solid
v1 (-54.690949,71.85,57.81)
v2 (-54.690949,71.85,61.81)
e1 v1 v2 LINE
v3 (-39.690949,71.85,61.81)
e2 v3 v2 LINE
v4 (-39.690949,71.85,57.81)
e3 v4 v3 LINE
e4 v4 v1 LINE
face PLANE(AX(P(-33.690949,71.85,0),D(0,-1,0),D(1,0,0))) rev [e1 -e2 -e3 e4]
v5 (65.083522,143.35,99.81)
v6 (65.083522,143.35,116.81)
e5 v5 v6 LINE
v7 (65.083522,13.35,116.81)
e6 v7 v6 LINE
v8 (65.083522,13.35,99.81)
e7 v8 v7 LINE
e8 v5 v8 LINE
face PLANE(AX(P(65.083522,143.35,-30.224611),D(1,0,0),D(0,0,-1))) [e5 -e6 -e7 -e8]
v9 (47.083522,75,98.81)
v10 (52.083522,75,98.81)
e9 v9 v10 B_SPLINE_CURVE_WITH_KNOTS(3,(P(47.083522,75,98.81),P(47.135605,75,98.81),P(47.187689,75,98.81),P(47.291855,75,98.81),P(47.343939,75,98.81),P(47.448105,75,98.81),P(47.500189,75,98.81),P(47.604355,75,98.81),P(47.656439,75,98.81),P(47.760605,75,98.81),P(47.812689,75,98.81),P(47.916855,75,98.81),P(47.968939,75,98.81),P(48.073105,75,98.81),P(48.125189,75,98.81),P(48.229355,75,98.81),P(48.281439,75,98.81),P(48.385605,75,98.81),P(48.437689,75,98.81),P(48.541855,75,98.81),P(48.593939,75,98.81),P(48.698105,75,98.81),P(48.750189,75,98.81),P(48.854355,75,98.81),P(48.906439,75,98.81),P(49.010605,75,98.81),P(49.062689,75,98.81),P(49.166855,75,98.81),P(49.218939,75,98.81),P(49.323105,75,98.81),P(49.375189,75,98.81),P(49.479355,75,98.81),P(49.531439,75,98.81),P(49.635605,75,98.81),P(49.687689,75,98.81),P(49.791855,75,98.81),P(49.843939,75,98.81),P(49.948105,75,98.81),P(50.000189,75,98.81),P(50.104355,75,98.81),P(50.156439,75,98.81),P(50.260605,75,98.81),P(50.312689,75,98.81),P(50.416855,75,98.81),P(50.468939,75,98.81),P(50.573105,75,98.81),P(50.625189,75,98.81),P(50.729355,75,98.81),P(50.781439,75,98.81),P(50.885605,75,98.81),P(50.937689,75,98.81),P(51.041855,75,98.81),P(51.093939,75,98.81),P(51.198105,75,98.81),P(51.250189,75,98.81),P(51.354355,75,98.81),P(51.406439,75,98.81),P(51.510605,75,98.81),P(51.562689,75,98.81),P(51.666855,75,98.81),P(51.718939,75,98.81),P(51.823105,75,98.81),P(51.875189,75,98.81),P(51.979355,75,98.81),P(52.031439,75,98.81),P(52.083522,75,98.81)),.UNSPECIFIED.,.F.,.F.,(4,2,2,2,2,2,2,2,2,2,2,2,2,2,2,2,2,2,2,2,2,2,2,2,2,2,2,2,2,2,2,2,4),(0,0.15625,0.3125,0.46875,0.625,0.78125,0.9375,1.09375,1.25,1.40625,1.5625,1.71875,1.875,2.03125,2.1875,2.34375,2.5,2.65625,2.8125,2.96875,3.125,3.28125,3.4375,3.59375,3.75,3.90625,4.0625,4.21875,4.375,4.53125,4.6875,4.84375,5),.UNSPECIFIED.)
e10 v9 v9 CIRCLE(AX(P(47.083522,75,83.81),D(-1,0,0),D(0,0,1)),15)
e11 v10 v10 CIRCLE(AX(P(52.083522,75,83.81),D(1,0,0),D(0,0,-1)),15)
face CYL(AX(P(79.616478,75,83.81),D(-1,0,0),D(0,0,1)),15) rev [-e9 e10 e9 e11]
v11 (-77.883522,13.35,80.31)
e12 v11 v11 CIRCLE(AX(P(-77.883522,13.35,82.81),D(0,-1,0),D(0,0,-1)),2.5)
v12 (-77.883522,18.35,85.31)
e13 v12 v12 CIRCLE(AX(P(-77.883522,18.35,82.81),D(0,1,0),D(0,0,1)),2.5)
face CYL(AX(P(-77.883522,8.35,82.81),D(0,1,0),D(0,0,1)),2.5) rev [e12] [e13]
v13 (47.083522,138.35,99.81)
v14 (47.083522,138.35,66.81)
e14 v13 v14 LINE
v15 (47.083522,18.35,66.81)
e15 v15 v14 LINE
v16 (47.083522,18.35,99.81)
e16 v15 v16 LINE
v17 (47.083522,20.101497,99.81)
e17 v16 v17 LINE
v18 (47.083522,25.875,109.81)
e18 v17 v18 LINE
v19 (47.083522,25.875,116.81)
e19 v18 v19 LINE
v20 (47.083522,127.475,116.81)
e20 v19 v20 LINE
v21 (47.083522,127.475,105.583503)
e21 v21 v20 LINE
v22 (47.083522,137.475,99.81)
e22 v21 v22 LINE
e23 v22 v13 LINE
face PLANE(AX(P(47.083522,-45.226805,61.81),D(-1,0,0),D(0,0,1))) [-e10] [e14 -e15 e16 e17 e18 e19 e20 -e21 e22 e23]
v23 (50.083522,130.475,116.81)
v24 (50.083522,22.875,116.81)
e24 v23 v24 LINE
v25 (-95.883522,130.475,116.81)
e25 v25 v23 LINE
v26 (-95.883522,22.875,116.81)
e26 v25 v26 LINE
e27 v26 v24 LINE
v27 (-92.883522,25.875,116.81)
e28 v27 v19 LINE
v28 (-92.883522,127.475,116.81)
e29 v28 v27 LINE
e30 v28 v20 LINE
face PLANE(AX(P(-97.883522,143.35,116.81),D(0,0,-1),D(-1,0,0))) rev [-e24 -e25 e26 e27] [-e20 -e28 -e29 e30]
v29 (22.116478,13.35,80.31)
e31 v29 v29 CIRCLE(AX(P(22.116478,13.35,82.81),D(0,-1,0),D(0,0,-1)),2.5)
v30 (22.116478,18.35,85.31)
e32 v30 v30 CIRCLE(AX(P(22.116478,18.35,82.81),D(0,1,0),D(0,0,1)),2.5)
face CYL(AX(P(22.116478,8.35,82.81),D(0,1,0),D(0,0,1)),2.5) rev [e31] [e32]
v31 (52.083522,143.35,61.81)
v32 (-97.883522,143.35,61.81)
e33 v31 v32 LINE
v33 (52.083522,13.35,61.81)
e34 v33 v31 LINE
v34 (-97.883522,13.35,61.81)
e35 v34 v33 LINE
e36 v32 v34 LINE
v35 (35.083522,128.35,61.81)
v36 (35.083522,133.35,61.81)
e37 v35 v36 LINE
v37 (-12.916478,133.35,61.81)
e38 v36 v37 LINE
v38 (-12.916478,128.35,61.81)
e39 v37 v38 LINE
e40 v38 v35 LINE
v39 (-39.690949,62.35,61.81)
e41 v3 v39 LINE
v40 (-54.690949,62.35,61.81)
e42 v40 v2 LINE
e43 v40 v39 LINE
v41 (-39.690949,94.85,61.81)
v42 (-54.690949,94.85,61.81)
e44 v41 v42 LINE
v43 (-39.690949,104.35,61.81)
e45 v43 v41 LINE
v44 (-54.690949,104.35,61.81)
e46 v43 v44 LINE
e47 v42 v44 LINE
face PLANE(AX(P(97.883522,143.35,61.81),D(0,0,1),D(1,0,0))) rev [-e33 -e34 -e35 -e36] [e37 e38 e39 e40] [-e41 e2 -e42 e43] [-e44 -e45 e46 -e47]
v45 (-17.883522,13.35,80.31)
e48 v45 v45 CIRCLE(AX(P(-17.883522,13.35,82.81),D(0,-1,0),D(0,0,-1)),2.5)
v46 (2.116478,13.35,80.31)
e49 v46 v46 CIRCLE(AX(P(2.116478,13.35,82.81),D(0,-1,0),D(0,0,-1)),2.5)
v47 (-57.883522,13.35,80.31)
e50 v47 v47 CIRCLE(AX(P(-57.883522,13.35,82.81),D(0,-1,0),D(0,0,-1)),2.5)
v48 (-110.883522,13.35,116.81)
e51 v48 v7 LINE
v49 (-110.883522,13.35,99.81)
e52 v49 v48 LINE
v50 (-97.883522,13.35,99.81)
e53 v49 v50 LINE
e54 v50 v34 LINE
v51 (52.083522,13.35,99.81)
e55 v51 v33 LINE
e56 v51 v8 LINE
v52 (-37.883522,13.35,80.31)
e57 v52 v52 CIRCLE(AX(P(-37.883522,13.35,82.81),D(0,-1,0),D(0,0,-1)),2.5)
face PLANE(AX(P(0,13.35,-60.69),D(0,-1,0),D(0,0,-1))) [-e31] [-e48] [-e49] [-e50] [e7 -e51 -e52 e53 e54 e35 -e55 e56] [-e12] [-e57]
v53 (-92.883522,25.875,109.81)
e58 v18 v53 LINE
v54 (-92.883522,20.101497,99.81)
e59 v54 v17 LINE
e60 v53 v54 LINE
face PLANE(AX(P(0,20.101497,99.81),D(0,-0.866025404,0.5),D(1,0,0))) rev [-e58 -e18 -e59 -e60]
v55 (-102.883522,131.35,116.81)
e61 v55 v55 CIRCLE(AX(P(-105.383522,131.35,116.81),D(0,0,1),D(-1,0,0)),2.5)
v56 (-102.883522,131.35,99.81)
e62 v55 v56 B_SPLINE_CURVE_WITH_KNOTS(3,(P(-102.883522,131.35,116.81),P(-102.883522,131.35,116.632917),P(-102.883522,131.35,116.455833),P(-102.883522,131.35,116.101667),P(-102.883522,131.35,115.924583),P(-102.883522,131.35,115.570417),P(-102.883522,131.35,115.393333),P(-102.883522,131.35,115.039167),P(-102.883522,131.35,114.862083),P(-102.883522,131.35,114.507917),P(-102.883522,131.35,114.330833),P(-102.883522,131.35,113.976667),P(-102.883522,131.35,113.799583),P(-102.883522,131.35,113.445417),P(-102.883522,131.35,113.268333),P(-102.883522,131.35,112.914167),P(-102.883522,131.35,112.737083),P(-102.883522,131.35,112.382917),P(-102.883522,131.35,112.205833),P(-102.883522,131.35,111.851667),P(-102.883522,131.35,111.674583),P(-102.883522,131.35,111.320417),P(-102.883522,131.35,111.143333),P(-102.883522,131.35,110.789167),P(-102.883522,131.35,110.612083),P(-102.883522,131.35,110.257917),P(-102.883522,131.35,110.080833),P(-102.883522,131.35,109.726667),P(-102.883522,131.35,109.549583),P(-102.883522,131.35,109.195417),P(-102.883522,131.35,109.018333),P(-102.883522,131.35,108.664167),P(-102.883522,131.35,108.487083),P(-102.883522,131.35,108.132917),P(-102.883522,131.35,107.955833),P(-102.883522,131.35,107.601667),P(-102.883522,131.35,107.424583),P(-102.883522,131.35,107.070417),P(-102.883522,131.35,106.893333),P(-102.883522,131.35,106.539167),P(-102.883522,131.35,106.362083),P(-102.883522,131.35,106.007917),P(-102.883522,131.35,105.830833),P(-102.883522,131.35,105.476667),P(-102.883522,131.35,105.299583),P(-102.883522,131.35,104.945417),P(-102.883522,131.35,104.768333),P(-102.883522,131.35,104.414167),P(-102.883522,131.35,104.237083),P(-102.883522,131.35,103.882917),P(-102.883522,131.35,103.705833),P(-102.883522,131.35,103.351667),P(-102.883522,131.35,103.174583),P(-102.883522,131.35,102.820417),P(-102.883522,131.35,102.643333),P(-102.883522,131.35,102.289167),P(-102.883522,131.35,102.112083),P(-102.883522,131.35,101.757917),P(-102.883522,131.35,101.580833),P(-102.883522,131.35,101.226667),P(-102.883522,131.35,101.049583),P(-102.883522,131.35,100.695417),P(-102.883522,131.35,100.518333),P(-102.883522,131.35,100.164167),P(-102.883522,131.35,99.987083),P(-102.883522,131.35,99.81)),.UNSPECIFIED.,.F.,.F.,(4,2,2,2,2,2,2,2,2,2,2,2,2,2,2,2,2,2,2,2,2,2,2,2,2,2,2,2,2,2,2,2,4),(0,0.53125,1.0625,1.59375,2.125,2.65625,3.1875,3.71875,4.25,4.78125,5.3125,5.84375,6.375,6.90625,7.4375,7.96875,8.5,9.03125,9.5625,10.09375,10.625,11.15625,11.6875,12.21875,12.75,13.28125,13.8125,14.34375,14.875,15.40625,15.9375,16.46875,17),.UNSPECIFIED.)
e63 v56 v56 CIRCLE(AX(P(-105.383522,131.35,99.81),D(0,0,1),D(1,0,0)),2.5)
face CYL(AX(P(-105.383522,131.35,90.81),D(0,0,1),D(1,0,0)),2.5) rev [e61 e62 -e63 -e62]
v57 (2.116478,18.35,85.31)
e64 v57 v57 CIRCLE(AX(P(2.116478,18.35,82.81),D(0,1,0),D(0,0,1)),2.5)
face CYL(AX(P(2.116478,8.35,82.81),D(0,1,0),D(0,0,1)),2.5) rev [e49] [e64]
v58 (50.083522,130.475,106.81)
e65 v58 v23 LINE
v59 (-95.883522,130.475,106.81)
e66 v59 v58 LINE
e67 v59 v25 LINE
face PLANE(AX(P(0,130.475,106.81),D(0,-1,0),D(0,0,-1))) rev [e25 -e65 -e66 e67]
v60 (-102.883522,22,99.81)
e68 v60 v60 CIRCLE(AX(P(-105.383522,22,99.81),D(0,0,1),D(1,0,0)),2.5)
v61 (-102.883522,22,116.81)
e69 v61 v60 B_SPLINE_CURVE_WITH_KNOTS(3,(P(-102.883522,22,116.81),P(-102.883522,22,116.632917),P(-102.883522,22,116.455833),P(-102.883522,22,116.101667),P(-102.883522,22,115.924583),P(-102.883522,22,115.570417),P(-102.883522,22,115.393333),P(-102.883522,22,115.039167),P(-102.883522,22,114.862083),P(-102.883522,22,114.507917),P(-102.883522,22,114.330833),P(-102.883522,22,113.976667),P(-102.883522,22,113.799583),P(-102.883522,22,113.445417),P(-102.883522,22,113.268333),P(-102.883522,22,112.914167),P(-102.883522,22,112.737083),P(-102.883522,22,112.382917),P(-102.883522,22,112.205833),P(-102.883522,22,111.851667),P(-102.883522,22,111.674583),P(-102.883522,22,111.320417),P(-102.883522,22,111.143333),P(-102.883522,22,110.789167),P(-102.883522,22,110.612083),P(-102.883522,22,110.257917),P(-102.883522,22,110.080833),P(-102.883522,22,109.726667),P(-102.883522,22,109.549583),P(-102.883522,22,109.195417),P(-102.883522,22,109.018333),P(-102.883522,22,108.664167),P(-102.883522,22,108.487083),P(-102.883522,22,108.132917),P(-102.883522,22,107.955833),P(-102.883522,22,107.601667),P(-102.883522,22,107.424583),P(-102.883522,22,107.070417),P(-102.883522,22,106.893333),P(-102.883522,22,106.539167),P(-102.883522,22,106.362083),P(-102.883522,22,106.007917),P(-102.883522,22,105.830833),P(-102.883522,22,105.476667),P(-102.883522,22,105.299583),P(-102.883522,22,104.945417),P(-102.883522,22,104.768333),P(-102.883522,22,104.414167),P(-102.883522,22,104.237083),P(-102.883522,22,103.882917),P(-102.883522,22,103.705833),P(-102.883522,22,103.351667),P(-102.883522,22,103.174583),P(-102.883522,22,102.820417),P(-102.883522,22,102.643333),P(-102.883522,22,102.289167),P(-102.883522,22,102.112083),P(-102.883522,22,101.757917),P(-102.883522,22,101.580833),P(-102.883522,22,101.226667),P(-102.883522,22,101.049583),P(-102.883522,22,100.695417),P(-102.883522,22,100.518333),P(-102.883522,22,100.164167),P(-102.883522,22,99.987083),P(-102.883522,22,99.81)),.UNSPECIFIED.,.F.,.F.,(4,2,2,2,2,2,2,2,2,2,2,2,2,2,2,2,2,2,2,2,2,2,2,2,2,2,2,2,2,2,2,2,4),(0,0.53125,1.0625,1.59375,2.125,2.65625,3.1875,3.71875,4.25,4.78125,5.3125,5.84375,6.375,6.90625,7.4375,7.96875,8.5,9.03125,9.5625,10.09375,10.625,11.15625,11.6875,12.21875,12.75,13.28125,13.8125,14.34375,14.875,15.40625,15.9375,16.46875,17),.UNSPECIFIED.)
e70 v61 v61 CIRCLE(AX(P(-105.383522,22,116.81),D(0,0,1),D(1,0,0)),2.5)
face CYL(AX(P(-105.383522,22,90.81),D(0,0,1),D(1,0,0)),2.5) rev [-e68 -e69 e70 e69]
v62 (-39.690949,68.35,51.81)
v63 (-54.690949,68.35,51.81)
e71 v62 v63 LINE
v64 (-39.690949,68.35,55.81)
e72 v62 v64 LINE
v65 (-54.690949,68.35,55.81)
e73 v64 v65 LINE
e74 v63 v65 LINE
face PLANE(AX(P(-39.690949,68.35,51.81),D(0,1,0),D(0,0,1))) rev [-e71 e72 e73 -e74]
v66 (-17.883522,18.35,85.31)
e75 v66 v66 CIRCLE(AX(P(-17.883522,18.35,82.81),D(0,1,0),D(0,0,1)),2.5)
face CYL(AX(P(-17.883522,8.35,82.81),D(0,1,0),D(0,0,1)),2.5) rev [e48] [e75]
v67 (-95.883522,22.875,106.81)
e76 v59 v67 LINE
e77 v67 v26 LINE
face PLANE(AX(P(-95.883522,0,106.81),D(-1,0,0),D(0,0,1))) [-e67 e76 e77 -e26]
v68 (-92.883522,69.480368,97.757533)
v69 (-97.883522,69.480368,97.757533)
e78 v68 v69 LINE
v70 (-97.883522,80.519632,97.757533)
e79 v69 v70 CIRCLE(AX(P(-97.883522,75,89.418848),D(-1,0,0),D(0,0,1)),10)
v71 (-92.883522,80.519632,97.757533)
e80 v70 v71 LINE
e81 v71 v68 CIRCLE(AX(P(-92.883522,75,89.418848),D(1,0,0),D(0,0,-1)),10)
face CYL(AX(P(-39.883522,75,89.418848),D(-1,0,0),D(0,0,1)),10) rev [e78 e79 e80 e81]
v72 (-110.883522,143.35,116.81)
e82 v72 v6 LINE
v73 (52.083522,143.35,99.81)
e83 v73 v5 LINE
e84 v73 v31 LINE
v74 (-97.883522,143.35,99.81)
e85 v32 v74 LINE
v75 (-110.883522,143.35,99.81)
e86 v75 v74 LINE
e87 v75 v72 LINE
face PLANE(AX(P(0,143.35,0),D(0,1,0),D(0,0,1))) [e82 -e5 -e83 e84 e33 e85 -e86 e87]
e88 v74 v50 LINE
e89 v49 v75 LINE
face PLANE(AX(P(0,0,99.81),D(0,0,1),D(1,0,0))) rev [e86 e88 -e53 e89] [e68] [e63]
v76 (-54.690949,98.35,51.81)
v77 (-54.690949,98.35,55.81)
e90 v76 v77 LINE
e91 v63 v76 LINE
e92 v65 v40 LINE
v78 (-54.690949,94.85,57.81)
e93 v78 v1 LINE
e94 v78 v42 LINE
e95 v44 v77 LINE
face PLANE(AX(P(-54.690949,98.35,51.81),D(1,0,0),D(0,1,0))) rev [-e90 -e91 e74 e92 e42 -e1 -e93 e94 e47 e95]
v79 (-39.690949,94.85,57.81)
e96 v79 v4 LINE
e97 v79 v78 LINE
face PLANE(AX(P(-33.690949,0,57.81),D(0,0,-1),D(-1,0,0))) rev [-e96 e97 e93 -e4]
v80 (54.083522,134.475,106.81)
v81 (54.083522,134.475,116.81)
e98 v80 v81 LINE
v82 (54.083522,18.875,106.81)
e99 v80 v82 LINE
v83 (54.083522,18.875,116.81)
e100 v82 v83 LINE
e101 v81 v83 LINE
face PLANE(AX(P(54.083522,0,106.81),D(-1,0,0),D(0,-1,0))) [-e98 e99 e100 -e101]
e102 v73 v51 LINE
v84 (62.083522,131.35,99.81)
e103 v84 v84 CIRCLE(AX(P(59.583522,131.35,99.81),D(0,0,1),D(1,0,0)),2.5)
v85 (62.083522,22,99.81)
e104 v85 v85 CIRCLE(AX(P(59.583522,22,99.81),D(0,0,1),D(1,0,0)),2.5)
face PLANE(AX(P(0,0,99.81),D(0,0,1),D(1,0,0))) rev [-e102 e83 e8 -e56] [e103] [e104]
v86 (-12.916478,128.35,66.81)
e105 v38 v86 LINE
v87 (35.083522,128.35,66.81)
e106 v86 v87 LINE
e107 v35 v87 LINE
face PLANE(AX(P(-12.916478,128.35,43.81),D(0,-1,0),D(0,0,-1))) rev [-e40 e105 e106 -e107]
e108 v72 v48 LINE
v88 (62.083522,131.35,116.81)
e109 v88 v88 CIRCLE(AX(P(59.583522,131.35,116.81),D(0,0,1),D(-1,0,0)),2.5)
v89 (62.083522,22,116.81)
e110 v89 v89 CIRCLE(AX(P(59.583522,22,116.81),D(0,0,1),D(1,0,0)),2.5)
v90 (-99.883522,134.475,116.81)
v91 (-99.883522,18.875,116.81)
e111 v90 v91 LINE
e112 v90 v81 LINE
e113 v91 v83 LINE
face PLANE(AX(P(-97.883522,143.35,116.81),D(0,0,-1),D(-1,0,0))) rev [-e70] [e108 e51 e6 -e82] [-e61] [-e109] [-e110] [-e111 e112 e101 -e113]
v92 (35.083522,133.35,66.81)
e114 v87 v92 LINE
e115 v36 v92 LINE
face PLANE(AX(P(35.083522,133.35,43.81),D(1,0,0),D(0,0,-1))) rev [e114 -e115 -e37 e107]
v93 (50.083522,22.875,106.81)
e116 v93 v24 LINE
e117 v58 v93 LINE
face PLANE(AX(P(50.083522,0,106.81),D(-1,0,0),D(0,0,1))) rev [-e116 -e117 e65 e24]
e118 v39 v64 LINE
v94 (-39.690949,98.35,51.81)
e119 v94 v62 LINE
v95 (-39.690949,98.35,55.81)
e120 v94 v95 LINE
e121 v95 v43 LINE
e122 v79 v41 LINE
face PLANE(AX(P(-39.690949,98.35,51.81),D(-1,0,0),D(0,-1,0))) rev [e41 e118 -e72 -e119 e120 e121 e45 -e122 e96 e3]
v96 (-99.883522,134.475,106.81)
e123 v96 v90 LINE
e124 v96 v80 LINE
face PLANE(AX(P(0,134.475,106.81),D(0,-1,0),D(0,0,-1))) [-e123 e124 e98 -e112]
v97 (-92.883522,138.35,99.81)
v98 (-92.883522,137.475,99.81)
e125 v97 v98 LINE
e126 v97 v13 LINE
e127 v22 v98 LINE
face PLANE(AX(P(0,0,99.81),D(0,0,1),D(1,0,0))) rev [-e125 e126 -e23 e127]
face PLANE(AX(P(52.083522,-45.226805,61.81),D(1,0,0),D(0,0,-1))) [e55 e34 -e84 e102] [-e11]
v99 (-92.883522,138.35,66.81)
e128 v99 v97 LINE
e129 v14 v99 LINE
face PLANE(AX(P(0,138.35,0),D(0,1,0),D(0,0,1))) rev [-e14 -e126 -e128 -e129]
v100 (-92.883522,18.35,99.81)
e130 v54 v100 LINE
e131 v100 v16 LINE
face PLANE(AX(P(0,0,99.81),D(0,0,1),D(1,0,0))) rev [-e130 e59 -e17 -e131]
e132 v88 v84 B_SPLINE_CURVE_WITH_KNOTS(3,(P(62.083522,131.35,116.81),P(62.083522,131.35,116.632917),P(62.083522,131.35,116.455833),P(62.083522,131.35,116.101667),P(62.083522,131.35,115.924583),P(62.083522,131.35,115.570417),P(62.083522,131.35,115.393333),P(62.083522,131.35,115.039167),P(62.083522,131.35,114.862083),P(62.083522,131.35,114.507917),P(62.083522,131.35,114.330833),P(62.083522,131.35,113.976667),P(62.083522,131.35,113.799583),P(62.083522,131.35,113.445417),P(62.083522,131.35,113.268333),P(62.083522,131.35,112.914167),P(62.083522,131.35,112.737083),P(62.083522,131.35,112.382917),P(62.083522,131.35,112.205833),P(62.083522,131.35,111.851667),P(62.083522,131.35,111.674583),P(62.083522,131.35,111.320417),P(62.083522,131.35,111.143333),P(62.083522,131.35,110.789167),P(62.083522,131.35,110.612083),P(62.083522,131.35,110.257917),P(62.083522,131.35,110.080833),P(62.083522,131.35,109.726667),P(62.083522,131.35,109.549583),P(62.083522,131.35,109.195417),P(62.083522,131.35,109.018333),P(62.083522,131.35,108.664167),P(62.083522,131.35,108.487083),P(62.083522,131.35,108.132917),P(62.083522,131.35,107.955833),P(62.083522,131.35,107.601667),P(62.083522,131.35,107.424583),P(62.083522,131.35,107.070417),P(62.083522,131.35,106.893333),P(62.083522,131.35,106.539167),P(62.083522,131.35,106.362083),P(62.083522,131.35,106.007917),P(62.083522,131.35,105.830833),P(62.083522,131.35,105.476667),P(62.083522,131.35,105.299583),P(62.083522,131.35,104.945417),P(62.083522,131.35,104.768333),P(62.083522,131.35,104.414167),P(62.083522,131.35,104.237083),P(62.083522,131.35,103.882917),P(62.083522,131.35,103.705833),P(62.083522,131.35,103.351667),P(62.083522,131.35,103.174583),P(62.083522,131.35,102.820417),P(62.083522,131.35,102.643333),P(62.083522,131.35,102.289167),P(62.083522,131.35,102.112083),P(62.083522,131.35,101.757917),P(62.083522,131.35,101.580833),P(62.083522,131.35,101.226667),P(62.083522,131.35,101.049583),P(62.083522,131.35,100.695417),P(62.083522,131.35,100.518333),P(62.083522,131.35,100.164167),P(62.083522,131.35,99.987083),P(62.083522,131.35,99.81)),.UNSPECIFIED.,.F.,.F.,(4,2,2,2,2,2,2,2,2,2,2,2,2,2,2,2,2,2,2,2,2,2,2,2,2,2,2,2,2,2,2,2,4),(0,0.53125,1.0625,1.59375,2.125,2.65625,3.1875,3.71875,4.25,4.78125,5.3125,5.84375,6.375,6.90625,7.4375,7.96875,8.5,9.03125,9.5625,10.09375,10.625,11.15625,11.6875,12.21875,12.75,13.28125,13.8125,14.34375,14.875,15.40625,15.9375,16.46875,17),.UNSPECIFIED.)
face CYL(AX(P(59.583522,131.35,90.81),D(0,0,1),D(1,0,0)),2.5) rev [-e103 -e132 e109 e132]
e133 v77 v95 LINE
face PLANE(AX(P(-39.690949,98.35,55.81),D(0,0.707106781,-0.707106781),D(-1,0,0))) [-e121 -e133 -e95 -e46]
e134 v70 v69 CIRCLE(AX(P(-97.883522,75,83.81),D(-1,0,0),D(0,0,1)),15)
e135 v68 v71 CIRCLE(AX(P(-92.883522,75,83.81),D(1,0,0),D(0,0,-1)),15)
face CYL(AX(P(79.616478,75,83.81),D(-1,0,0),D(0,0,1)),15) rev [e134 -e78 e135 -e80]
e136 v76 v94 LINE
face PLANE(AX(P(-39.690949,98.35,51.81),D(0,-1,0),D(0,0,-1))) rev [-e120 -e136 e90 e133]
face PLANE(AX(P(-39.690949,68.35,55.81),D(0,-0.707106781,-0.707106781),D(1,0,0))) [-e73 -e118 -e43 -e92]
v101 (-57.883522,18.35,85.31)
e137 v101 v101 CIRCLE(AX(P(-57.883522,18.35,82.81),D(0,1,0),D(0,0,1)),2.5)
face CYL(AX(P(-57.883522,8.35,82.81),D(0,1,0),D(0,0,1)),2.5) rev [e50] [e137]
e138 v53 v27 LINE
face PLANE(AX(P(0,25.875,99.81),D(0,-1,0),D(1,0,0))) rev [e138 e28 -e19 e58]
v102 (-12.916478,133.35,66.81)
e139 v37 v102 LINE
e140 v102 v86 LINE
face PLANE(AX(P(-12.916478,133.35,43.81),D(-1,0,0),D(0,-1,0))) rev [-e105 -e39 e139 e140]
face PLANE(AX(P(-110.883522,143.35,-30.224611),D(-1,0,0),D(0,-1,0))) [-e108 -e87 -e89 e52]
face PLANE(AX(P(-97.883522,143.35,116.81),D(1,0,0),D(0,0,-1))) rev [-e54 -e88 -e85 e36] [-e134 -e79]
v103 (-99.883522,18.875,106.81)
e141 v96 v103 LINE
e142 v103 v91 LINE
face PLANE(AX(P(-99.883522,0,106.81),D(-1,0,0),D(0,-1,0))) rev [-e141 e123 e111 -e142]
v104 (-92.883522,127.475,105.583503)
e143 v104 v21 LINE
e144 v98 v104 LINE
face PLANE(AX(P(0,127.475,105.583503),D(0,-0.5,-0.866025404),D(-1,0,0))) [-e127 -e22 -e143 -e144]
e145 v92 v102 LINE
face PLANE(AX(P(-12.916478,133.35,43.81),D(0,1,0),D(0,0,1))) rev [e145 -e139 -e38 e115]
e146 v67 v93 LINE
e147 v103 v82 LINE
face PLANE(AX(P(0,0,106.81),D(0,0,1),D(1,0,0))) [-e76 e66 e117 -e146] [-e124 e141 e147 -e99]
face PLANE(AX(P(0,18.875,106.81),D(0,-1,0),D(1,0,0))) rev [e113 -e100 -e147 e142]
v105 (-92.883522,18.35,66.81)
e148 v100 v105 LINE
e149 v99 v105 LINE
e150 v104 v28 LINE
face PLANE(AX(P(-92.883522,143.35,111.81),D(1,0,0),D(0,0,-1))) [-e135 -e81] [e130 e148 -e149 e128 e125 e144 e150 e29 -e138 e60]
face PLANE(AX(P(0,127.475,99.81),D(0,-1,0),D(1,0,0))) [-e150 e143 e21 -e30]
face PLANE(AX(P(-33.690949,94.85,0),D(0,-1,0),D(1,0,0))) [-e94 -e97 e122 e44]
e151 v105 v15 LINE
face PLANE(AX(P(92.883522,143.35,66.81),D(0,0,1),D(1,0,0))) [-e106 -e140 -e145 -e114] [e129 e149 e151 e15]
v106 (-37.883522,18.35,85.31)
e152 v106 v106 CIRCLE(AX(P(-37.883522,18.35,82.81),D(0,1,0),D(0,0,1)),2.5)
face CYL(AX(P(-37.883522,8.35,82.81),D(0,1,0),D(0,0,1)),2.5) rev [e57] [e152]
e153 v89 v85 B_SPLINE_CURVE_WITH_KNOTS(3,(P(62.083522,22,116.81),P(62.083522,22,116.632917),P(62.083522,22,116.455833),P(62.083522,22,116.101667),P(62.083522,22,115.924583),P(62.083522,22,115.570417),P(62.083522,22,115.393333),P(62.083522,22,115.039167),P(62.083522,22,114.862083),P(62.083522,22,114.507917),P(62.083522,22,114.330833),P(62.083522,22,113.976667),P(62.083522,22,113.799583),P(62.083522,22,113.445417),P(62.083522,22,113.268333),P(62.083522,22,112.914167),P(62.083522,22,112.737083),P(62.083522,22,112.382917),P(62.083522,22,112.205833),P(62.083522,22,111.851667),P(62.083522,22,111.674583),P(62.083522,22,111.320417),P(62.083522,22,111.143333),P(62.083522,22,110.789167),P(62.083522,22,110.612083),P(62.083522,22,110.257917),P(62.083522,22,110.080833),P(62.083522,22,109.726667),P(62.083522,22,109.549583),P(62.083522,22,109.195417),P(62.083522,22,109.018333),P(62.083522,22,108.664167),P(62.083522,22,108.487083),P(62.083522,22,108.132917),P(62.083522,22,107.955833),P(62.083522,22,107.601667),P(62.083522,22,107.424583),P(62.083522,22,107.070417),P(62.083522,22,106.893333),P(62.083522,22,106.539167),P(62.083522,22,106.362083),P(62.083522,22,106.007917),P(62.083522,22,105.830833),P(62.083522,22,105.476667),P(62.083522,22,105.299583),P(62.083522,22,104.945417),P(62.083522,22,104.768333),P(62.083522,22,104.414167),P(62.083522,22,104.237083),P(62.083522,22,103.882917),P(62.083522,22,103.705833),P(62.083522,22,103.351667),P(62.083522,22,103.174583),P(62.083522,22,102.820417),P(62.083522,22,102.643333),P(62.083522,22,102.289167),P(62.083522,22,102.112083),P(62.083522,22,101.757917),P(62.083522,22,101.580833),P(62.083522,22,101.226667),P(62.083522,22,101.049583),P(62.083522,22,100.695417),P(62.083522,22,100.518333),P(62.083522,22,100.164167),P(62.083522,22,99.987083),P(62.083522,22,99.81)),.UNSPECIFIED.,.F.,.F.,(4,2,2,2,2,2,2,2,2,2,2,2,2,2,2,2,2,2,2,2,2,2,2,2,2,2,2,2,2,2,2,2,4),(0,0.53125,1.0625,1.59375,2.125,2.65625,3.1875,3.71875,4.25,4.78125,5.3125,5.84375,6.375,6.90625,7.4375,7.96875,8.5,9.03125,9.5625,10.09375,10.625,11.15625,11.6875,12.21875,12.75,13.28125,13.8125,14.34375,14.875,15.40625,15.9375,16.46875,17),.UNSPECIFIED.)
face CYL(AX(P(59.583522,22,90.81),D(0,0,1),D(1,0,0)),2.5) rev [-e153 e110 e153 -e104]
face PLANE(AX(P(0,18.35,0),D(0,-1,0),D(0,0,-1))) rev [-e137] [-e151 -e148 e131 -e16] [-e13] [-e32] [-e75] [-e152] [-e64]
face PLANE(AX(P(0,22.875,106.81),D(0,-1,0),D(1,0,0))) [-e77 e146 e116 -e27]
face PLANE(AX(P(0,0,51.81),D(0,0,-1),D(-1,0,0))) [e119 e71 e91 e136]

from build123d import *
from OCP.BRepFilletAPI import BRepFilletAPI_MakeChamfer

# Parameters (mm, degrees)
SKETCH1_R               = 172.5
BOSS_EXTRUDE1_DEPTH     = 10
SKETCH2_R               = 48.41
CUT_EXTRUDE1_DEPTH      = 10
BOSS_EXTRUDE2_DEPTH     = 5
CUT_EXTRUDE2_DEPTH      = 497
CUT_EXTRUDE6_START      = -497
CUT_EXTRUDE6_DEPTH      = 497
SKETCH6_W               = 195.767044214
SKETCH6_H               = 55
SKETCH6_W_2             = 185.767044214
SKETCH6_H_2             = 45
BOSS_EXTRUDE3_DEPTH     = 133.35
SKETCH7_W               = 185.767044214
SKETCH7_H               = 45
BOSS_EXTRUDE4_DEPTH     = 5
BOSS_EXTRUDE5_DEPTH     = 8
CHAMFER1_SIZE           = 8
CHAMFER1_SIZE2          = 6.250285012
CHAMFER1_PART_2_SIZE    = 8
CHAMFER1_PART_2_SIZE2   = 6.250285012
CHAMFER1_PART_3_SIZE    = 8
CHAMFER1_PART_3_SIZE2   = 6.250285012
FILLET1_R               = 38
SKETCH9_R               = 374.079334695
CUT_EXTRUDE7_DEPTH      = 93
CUT_EXTRUDE8_DEPTH      = 93
CUT_EXTRUDE8_DEPTH_BACK = 93
SKETCH10_R              = 229.38613092
SKETCH10_R_2            = 152.4
SKETCH11_W              = 291.443368419
SKETCH11_H              = 134.798764099
SKETCH11_W_2            = 144.967044214
SKETCH11_H_2            = 55
CUT_EXTRUDE9_DEPTH      = 143
SKETCH12_W              = 5
SKETCH12_H              = 55
BOSS_EXTRUDE6_DEPTH     = 133.35
SKETCH13_R              = 10
CUT_EXTRUDE10_DEPTH     = 58
SKETCH14_W              = 139.967044214
SKETCH14_H              = 45
BOSS_EXTRUDE7_DEPTH     = 5
SKETCH15_W              = 139.967044214
SKETCH15_H              = 123.35
CUT_EXTRUDE11_DEPTH     = 13
SKETCH16_W              = 10
SKETCH16_H              = 133.35
SKETCH16_W_2            = 149.967044214
BOSS_EXTRUDE9_DEPTH     = 17
SKETCH17_W              = 153.967044214
SKETCH17_H              = 115.6
SKETCH17_W_2            = 145.967044214
SKETCH17_H_2            = 107.6
CUT_EXTRUDE12_DEPTH     = 10
CHAMFER2_SIZE           = 10
CHAMFER2_SIZE2          = 5.773502692
SKETCH24_R              = 15
CUT_EXTRUDE16_DEPTH     = 177.5
SKETCH20_W              = 169.967044214
SKETCH20_H              = 3.35
CUT_EXTRUDE17_DEPTH     = 177.5
SKETCH25_W              = 139.967044214
SKETCH25_H              = 38.773502692
BOSS_EXTRUDE11_DEPTH    = 5
SKETCH26_W              = 3
SKETCH26_H              = 130
BOSS_EXTRUDE12_DEPTH    = 17
SKETCH18_R              = 2.5
CUT_EXTRUDE19_DEPTH     = 26
SKETCH27_W              = 48
SKETCH27_H              = 5
CUT_EXTRUDE20_DEPTH     = 23
SKETCH28_R              = 2.5
CUT_EXTRUDE21_DEPTH     = 10
SKETCH29_W              = 15
SKETCH29_H              = 30
BOSS_EXTRUDE13_DEPTH    = 10
SKETCH30_W              = 4
SKETCH30_H              = 23
CUT_EXTRUDE22_DEPTH     = 21
CHAMFER3_SIZE           = 6


with BuildPart() as part:
    # Sketch1 → Boss-Extrude1 (new body)
    with BuildSketch(Plane(origin=(0, 0, 0), x_dir=(1, 0, 0), z_dir=(0, 1, 0))):
        with Locations(Location((0, 0, 0), (0, 0, 270))):
            Circle(SKETCH1_R)
    extrude(amount=BOSS_EXTRUDE1_DEPTH)

    # Sketch2 → Cut-Extrude1 (cut)
    with BuildSketch(Plane(origin=(0, 10, 0), x_dir=(1, 0, 0), z_dir=(0, 1, 0))):
        with Locations((-75.91, -178.72)):
            Circle(SKETCH2_R)
        with Locations((75.91, -178.72)):
            Circle(SKETCH2_R)
    extrude(amount=-CUT_EXTRUDE1_DEPTH, mode=Mode.SUBTRACT)

    # Sketch3 → Boss-Extrude2 (add)
    with BuildSketch(Plane(origin=(0, 10, 0), x_dir=(1, 0, 0), z_dir=(0, 1, 0))):
        with BuildLine():
            Line((-98.968297449, -119.81), (98.968297449, -119.81))
            ThreePointArc((98.968297449, -119.81), (0, 155.4), (-98.968297449, -119.81))
        make_face()
        with BuildLine():
            ThreePointArc((97.883522107, -116.81), (0, 152.4), (-97.883522107, -116.81))
            Line((-97.883522107, -116.81), (97.883522107, -116.81))
        make_face(mode=Mode.SUBTRACT)
    extrude(amount=BOSS_EXTRUDE2_DEPTH)

    # Sketch4 → Cut-Extrude2 (cut)
    with BuildSketch(Plane(origin=(0, 10, 0), x_dir=(1, 0, 0), z_dir=(0, 1, 0))):
        Polygon((-28.261160255, -170.169200565), (28.261160255, -170.169200565), (28.261160255, -183.836149753), (-30.300470404, -183.836149753), align=None)
    extrude(amount=-CUT_EXTRUDE2_DEPTH, mode=Mode.SUBTRACT)

    # Sketch5 → Cut-Extrude6 (cut)
    with BuildSketch(Plane(origin=(0, 10, 0), x_dir=(1, 0, 0), z_dir=(0, 1, 0)).offset(CUT_EXTRUDE6_START)):
        with BuildLine():
            ThreePointArc((26.702080818, 170.420799435), (0, 172.5), (-26.702080818, 170.420799435))
            Line((-26.702080818, 170.420799435), (26.702080818, 170.420799435))
        make_face()
        with BuildLine():
            ThreePointArc((166.525, -45.007492432), (172.5, 0), (166.525, 45.007492432))
            Line((166.525, 45.007492432), (166.525, -45.007492432))
        make_face()
        with BuildLine():
            Line((-166.525, -45.007492432), (-166.525, 45.007492432))
            ThreePointArc((-166.525, 45.007492432), (-172.5, 0), (-166.525, -45.007492432))
        make_face()
    extrude(amount=CUT_EXTRUDE6_DEPTH, mode=Mode.SUBTRACT)

    # Sketch6 → Boss-Extrude3 (add)
    with BuildSketch(Plane(origin=(0, 10, 0), x_dir=(1, 0, 0), z_dir=(0, 1, 0))):
        with Locations((0, -89.31)):
            Rectangle(SKETCH6_W, SKETCH6_H)
        with Locations((0, -89.31)):
            Rectangle(SKETCH6_W_2, SKETCH6_H_2, mode=Mode.SUBTRACT)
    extrude(amount=BOSS_EXTRUDE3_DEPTH)

    # Sketch7 → Boss-Extrude4 (add)
    with BuildSketch(Plane(origin=(0, 10, 0), x_dir=(1, 0, 0), z_dir=(0, 1, 0))):
        with Locations((0, -89.31)):
            Rectangle(SKETCH7_W, SKETCH7_H)
    extrude(amount=BOSS_EXTRUDE4_DEPTH)

    # Sketch8 → Boss-Extrude5 (add)
    with BuildSketch(Plane(origin=(0, 10, 0), x_dir=(1, 0, 0), z_dir=(0, 1, 0))):
        with BuildLine():
            Line((-97.883522107, -61.81), (-112.883522107, -61.81))
            Line((-112.883522107, -61.81), (-112.883522107, -101.267136509))
            ThreePointArc((-112.883522107, -101.267136509), (-105.634768892, -108.807252061), (-97.883522107, -115.829782871))
            Line((-97.883522107, -115.829782871), (-97.883522107, -61.81))
        make_face()
        with BuildLine():
            Line((-88.028513968, -46.81), (-88.028513968, -61.81))
            Line((-88.028513968, -61.81), (97.883522107, -61.81))
            Line((97.883522107, -61.81), (97.883522107, -115.829782871))
            ThreePointArc((97.883522107, -115.829782871), (105.634768892, -108.807252061), (112.883522107, -101.267136509))
            Line((112.883522107, -101.267136509), (112.883522107, -46.81))
            Line((112.883522107, -46.81), (-88.028513968, -46.81))
        make_face()
    extrude(amount=BOSS_EXTRUDE5_DEPTH)

    # Chamfer1
    chamfer1_edges = [part.edges().sort_by_distance(p)[0] for p in [
        (-97.883522107, 18, 88.819891436),
    ]]
    chamfer1_side = [part.faces().sort_by_distance(p)[0] for p in [
        (-97.883522107, 80.599247918, 89.340686997),
    ]]
    chamfer(chamfer1_edges, length=CHAMFER1_SIZE, length2=CHAMFER1_SIZE2, reference=chamfer1_side[0])

    # Chamfer1 part 2
    chamfer1_part_2_edges = [part.edges().sort_by_distance(p)[0] for p in [
        (4.927504069, 18, 61.81),
    ]]
    chamfer1_part_2_side = [part.faces().sort_by_distance(p)[0] for p in [
        (-0.807441513, 80.139082253, 61.81),
    ]]
    chamfer(chamfer1_part_2_edges, length=CHAMFER1_PART_2_SIZE, length2=CHAMFER1_PART_2_SIZE2, reference=chamfer1_part_2_side[0])

    # Chamfer1 part 3
    chamfer1_part_3_edges = [part.edges().sort_by_distance(p)[0] for p in [
        (97.883522107, 18, 88.819891436),
    ]]
    chamfer1_part_3_side = [part.faces().sort_by_distance(p)[0] for p in [
        (97.883522107, 80.599247918, 89.340686997),
    ]]
    chamfer(chamfer1_part_3_edges, length=CHAMFER1_PART_3_SIZE, length2=CHAMFER1_PART_3_SIZE2, reference=chamfer1_part_3_side[0])

    # Fillet1
    # the kernel refuses this fillet: 38 mm, written as the material it adds along each edge
    with BuildSketch(Plane(origin=(-97.883522107, 26, 148.028657271), x_dir=(-0.61566147532566, -0.7880107536067207, 0), z_dir=(0, 0, -1))) as fillet1_piece_1_section:
        with BuildLine():
            CenterArc((13.24591235, 37.873851244), FILLET1_R, 232, 33.330100487)
            Line((-10.149223713, 7.929442607), (0, 0))
            Line((0, 0), (10.152145721, 0))
        make_face()
    fillet1_piece_1 = extrude(amount=86.218657271, mode=Mode.PRIVATE)
    fillet1_piece_1 = fillet1_piece_1 & Plane(origin=(0, 26, 0), x_dir=(-0.7443687577094257, 0, 0.6677687867414337), z_dir=(0, -1, 0)) * Cylinder(151.65, 214, mode=Mode.PRIVATE)
    add(fillet1_piece_1)
    with BuildSketch(Plane(origin=(-88.028513968, 26, 61.81), x_dir=(0, 1, 0), z_dir=(1, 0, 0))) as fillet1_piece_2_section:
        with BuildLine():
            CenterArc((12.87954976, -38), FILLET1_R, 90, 33.330100487)
            Line((-8, -6.250285012), (0, 0))
            Line((0, 0), (12.87954976, 0))
        make_face()
    fillet1_piece_2 = extrude(amount=218.110910475, mode=Mode.PRIVATE)
    fillet1_piece_2 = fillet1_piece_2 - Plane(origin=(135.883522107, 38.87954976, 61.81), x_dir=(-0.8355188154722692, -0.5494618357919104, 0), z_dir=(0, 0, -1)) * Cylinder(38, 488, mode=Mode.PRIVATE)
    add(fillet1_piece_2)
    with BuildSketch(Plane(origin=(97.883522107, 26, 29.6111256), x_dir=(0.61566147532566, -0.7880107536067207, 0), z_dir=(0, 0, 1))) as fillet1_piece_3_section:
        with BuildLine():
            CenterArc((13.24591235, 37.873851244), FILLET1_R, 232, 33.330100487)
            Line((-10.149223713, 7.929442607), (0, 0))
            Line((0, 0), (10.152145721, 0))
        make_face()
    fillet1_piece_3 = extrude(amount=118.417531672, mode=Mode.PRIVATE)
    fillet1_piece_3 = fillet1_piece_3 & Plane(origin=(0, 26, 0), x_dir=(0.6454567893612635, 0, 0.7637967878090673), z_dir=(0, -1, 0)) * Cylinder(151.65, 278, mode=Mode.PRIVATE)
    fillet1_piece_3 = fillet1_piece_3 - Plane(origin=(97.883522107, 38.87954976, 23.81), x_dir=(0, 0, 1), z_dir=(-1, 0, 0)) * Cylinder(38, 278, mode=Mode.PRIVATE)
    add(fillet1_piece_3)

    # Sketch9 → Cut-Extrude7 (cut)
    with BuildSketch(Plane(origin=(0, 10, 0), x_dir=(1, 0, 0), z_dir=(0, 1, 0))):
        Circle(SKETCH9_R)
    extrude(amount=-CUT_EXTRUDE7_DEPTH, mode=Mode.SUBTRACT)

    # Sketch10 → Cut-Extrude8 (cut, two sides: drawn at the far end of the back side and taken through both)
    with BuildSketch(Plane.XZ.offset(-10).offset(-CUT_EXTRUDE8_DEPTH_BACK)):
        Circle(SKETCH10_R)
        Circle(SKETCH10_R_2, mode=Mode.SUBTRACT)
    extrude(amount=CUT_EXTRUDE8_DEPTH + CUT_EXTRUDE8_DEPTH_BACK, mode=Mode.SUBTRACT)

    # Sketch11 → Cut-Extrude9 (cut)
    with BuildSketch(Plane(origin=(0, 143.35, 0), x_dir=(1, 0, 0), z_dir=(0, 1, 0))):
        with Locations((4.840839595, -88.771460056)):
            Rectangle(SKETCH11_W, SKETCH11_H)
        with Locations((-25.4, -89.31)):
            Rectangle(SKETCH11_W_2, SKETCH11_H_2, mode=Mode.SUBTRACT)
    extrude(amount=-CUT_EXTRUDE9_DEPTH, mode=Mode.SUBTRACT)

    # Sketch12 → Boss-Extrude6 (add)
    with BuildSketch(Plane(origin=(0, 143.35, 0), x_dir=(1, 0, 0), z_dir=(0, 1, 0))):
        with Locations((49.583522107, -89.31)):
            Rectangle(SKETCH12_W, SKETCH12_H)
    extrude(amount=-BOSS_EXTRUDE6_DEPTH)

    # Sketch13 → Cut-Extrude10 (cut)
    with BuildSketch(Plane.ZY.offset(97.883522107)):
        with Locations((89.418847681, 75)):
            Circle(SKETCH13_R)
    extrude(amount=-CUT_EXTRUDE10_DEPTH, mode=Mode.SUBTRACT)

    # Sketch14 → Boss-Extrude7 (add)
    with BuildSketch(Plane(origin=(0, 143.35, 0), x_dir=(1, 0, 0), z_dir=(0, 1, 0))):
        with Locations((-22.9, -89.31)):
            Rectangle(SKETCH14_W, SKETCH14_H)
    extrude(amount=-BOSS_EXTRUDE7_DEPTH)

    # Sketch15 → Cut-Extrude11 (cut)
    with BuildSketch(Plane.XY.offset(116.81)):
        with Locations((-22.9, 76.675)):
            Rectangle(SKETCH15_W, SKETCH15_H)
    extrude(amount=-CUT_EXTRUDE11_DEPTH, mode=Mode.SUBTRACT)

    # Sketch16 → Boss-Extrude9 (add)
    # profile 1 of 5: a face of its own
    with BuildSketch(Plane.XY.offset(116.81)):
        with Locations((-102.883522107, 76.675)):
            Rectangle(SKETCH16_W, SKETCH16_H)
    # profile 2 of 5: a face of its own
    with BuildSketch(Plane.XY.offset(116.81)):
        with Locations((-22.9, 76.675)):
            Rectangle(SKETCH16_W_2, SKETCH16_H)
        Polygon((-92.883522107, 127.475), (-92.883522107, 138.35), (47.083522107, 138.35), (47.083522107, 127.475), (47.083522107, 76.675), (47.083522107, 25.875), (47.083522107, 15), (-92.883522107, 15), (-92.883522107, 25.875), (-92.883522107, 76.675), align=None, mode=Mode.SUBTRACT)
    # profile 3 of 5: a face of its own
    with BuildSketch(Plane.XY.offset(116.81)):
        with Locations((57.083522107, 76.675)):
            Rectangle(SKETCH16_W, SKETCH16_H)
    # profile 4 of 5: a face of its own
    with BuildSketch(Plane.XY.offset(116.81)):
        Polygon((47.083522107, 138.35), (-92.883522107, 138.35), (-92.883522107, 127.475), (-22.9, 127.475), (47.083522107, 127.475), align=None)
    # profile 5 of 5: a face of its own
    with BuildSketch(Plane.XY.offset(116.81)):
        Polygon((-22.9, 25.875), (-92.883522107, 25.875), (-92.883522107, 15), (47.083522107, 15), (47.083522107, 25.875), align=None)
    extrude(amount=-BOSS_EXTRUDE9_DEPTH)

    # Sketch17 → Cut-Extrude12 (cut)
    with BuildSketch(Plane.XY.offset(116.81)):
        with Locations((-22.9, 76.675)):
            Rectangle(SKETCH17_W, SKETCH17_H)
        with Locations((-22.9, 76.675)):
            Rectangle(SKETCH17_W_2, SKETCH17_H_2, mode=Mode.SUBTRACT)
    extrude(amount=-CUT_EXTRUDE12_DEPTH, mode=Mode.SUBTRACT)

    # Chamfer2: one chamfer whose edges measure the first distance from different faces: ONE call of the kernel's chamfer builder (chamfer() names one face for all edges)
    chamfer2_edges_1 = [part.edges().sort_by_distance(p)[0] for p in [
        (-22.9, 25.875, 99.81),
    ]]
    chamfer2_side_1 = [part.faces().sort_by_distance(p)[0] for p in [
        (-22.9, 25.875, 108.31),
    ]]
    chamfer2_edges_2 = [part.edges().sort_by_distance(p)[0] for p in [
        (-22.9, 127.475, 99.81),
    ]]
    chamfer2_side_2 = [part.faces().sort_by_distance(p)[0] for p in [
        (-22.9, 132.9125, 99.81),
    ]]
    chamfer2 = BRepFilletAPI_MakeChamfer(part.part.solid().wrapped)
    for e in chamfer2_edges_1:
        chamfer2.Add(CHAMFER2_SIZE, CHAMFER2_SIZE2, e.wrapped, chamfer2_side_1[0].wrapped)  # the first distance lies on this face
    for e in chamfer2_edges_2:
        chamfer2.Add(CHAMFER2_SIZE, CHAMFER2_SIZE2, e.wrapped, chamfer2_side_2[0].wrapped)  # the first distance lies on this face
    add(Compound.cast(chamfer2.Shape()), mode=Mode.REPLACE)

    # Sketch24 → Cut-Extrude16 (cut)
    with BuildSketch(Plane.ZY.offset(97.883522107)):
        with Locations((83.81, 75)):
            Circle(SKETCH24_R)
    extrude(amount=-CUT_EXTRUDE16_DEPTH, mode=Mode.SUBTRACT)

    # Sketch20 → Cut-Extrude17 (cut)
    with BuildSketch(Plane.XY.offset(116.81)):
        with Locations((-22.9, 11.675)):
            Rectangle(SKETCH20_W, SKETCH20_H)
    extrude(amount=-CUT_EXTRUDE17_DEPTH, mode=Mode.SUBTRACT)

    # Sketch25 → Boss-Extrude11 (add)
    with BuildSketch(Plane(origin=(0, 13.35, 0), x_dir=(-1, 0, 0), z_dir=(0, -1, 0))):
        with Locations((22.9, -86.196751346)):
            Rectangle(SKETCH25_W, SKETCH25_H)
    extrude(amount=-BOSS_EXTRUDE11_DEPTH)

    # Sketch26 → Boss-Extrude12 (add)
    with BuildSketch(Plane.XY.offset(116.81)):
        with Locations((-109.383522107, 78.35)):
            Rectangle(SKETCH26_W, SKETCH26_H)
        with Locations((63.583522107, 78.35)):
            Rectangle(SKETCH26_W, SKETCH26_H)
    extrude(amount=-BOSS_EXTRUDE12_DEPTH)

    # Sketch18 → Cut-Extrude19 (cut)
    with BuildSketch(Plane.XY.offset(116.81)):
        with Locations((-105.383522107, 22)):
            Circle(SKETCH18_R)
        with Locations((59.583522107, 22)):
            Circle(SKETCH18_R)
        with Locations((59.583522107, 131.35)):
            Circle(SKETCH18_R)
        with Locations((-105.383522107, 131.35)):
            Circle(SKETCH18_R)
    extrude(amount=-CUT_EXTRUDE19_DEPTH, mode=Mode.SUBTRACT)

    # Sketch27 → Cut-Extrude20 (cut)
    with BuildSketch(Plane.XY.offset(66.81)):
        with Locations((11.083522107, 130.85)):
            Rectangle(SKETCH27_W, SKETCH27_H)
    extrude(amount=-CUT_EXTRUDE20_DEPTH, mode=Mode.SUBTRACT)

    # Sketch28 → Cut-Extrude21 (cut)
    with BuildSketch(Plane(origin=(0, 18.35, 0), x_dir=(1, 0, 0), z_dir=(0, 1, 0))):
        with Locations(Location((-77.883522107, -82.81, 0), (0, 0, 270))):
            Circle(SKETCH28_R)
        with Locations(Location((-57.883522107, -82.81, 0), (0, 0, 270))):
            Circle(SKETCH28_R)
        with Locations(Location((-37.883522107, -82.81, 0), (0, 0, 270))):
            Circle(SKETCH28_R)
        with Locations(Location((-17.883522107, -82.81, 0), (0, 0, 270))):
            Circle(SKETCH28_R)
        with Locations(Location((2.116477893, -82.81, 0), (0, 0, 270))):
            Circle(SKETCH28_R)
        with Locations(Location((22.116477893, -82.81, 0), (0, 0, 270))):
            Circle(SKETCH28_R)
    extrude(amount=-CUT_EXTRUDE21_DEPTH, mode=Mode.SUBTRACT)

    # Sketch29 → Boss-Extrude13 (add)
    with BuildSketch(Plane(origin=(0, 0, 61.81), x_dir=(-1, 0, 0), z_dir=(0, 0, -1))):
        with Locations((47.190948631, 83.35)):
            Rectangle(SKETCH29_W, SKETCH29_H)
    extrude(amount=BOSS_EXTRUDE13_DEPTH)

    # Sketch30 → Cut-Extrude22 (cut)
    with BuildSketch(Plane.ZY.offset(54.690948631)):
        with Locations((59.81, 83.35)):
            Rectangle(SKETCH30_W, SKETCH30_H)
    extrude(amount=-CUT_EXTRUDE22_DEPTH, mode=Mode.SUBTRACT)

    # Chamfer3
    chamfer3_edges = [part.edges().sort_by_distance(p)[0] for p in [
        (-47.190948631, 68.35, 61.81),
        (-47.190948631, 98.35, 61.81),
    ]]
    chamfer(chamfer3_edges, length=CHAMFER3_SIZE)


solid = part.part
